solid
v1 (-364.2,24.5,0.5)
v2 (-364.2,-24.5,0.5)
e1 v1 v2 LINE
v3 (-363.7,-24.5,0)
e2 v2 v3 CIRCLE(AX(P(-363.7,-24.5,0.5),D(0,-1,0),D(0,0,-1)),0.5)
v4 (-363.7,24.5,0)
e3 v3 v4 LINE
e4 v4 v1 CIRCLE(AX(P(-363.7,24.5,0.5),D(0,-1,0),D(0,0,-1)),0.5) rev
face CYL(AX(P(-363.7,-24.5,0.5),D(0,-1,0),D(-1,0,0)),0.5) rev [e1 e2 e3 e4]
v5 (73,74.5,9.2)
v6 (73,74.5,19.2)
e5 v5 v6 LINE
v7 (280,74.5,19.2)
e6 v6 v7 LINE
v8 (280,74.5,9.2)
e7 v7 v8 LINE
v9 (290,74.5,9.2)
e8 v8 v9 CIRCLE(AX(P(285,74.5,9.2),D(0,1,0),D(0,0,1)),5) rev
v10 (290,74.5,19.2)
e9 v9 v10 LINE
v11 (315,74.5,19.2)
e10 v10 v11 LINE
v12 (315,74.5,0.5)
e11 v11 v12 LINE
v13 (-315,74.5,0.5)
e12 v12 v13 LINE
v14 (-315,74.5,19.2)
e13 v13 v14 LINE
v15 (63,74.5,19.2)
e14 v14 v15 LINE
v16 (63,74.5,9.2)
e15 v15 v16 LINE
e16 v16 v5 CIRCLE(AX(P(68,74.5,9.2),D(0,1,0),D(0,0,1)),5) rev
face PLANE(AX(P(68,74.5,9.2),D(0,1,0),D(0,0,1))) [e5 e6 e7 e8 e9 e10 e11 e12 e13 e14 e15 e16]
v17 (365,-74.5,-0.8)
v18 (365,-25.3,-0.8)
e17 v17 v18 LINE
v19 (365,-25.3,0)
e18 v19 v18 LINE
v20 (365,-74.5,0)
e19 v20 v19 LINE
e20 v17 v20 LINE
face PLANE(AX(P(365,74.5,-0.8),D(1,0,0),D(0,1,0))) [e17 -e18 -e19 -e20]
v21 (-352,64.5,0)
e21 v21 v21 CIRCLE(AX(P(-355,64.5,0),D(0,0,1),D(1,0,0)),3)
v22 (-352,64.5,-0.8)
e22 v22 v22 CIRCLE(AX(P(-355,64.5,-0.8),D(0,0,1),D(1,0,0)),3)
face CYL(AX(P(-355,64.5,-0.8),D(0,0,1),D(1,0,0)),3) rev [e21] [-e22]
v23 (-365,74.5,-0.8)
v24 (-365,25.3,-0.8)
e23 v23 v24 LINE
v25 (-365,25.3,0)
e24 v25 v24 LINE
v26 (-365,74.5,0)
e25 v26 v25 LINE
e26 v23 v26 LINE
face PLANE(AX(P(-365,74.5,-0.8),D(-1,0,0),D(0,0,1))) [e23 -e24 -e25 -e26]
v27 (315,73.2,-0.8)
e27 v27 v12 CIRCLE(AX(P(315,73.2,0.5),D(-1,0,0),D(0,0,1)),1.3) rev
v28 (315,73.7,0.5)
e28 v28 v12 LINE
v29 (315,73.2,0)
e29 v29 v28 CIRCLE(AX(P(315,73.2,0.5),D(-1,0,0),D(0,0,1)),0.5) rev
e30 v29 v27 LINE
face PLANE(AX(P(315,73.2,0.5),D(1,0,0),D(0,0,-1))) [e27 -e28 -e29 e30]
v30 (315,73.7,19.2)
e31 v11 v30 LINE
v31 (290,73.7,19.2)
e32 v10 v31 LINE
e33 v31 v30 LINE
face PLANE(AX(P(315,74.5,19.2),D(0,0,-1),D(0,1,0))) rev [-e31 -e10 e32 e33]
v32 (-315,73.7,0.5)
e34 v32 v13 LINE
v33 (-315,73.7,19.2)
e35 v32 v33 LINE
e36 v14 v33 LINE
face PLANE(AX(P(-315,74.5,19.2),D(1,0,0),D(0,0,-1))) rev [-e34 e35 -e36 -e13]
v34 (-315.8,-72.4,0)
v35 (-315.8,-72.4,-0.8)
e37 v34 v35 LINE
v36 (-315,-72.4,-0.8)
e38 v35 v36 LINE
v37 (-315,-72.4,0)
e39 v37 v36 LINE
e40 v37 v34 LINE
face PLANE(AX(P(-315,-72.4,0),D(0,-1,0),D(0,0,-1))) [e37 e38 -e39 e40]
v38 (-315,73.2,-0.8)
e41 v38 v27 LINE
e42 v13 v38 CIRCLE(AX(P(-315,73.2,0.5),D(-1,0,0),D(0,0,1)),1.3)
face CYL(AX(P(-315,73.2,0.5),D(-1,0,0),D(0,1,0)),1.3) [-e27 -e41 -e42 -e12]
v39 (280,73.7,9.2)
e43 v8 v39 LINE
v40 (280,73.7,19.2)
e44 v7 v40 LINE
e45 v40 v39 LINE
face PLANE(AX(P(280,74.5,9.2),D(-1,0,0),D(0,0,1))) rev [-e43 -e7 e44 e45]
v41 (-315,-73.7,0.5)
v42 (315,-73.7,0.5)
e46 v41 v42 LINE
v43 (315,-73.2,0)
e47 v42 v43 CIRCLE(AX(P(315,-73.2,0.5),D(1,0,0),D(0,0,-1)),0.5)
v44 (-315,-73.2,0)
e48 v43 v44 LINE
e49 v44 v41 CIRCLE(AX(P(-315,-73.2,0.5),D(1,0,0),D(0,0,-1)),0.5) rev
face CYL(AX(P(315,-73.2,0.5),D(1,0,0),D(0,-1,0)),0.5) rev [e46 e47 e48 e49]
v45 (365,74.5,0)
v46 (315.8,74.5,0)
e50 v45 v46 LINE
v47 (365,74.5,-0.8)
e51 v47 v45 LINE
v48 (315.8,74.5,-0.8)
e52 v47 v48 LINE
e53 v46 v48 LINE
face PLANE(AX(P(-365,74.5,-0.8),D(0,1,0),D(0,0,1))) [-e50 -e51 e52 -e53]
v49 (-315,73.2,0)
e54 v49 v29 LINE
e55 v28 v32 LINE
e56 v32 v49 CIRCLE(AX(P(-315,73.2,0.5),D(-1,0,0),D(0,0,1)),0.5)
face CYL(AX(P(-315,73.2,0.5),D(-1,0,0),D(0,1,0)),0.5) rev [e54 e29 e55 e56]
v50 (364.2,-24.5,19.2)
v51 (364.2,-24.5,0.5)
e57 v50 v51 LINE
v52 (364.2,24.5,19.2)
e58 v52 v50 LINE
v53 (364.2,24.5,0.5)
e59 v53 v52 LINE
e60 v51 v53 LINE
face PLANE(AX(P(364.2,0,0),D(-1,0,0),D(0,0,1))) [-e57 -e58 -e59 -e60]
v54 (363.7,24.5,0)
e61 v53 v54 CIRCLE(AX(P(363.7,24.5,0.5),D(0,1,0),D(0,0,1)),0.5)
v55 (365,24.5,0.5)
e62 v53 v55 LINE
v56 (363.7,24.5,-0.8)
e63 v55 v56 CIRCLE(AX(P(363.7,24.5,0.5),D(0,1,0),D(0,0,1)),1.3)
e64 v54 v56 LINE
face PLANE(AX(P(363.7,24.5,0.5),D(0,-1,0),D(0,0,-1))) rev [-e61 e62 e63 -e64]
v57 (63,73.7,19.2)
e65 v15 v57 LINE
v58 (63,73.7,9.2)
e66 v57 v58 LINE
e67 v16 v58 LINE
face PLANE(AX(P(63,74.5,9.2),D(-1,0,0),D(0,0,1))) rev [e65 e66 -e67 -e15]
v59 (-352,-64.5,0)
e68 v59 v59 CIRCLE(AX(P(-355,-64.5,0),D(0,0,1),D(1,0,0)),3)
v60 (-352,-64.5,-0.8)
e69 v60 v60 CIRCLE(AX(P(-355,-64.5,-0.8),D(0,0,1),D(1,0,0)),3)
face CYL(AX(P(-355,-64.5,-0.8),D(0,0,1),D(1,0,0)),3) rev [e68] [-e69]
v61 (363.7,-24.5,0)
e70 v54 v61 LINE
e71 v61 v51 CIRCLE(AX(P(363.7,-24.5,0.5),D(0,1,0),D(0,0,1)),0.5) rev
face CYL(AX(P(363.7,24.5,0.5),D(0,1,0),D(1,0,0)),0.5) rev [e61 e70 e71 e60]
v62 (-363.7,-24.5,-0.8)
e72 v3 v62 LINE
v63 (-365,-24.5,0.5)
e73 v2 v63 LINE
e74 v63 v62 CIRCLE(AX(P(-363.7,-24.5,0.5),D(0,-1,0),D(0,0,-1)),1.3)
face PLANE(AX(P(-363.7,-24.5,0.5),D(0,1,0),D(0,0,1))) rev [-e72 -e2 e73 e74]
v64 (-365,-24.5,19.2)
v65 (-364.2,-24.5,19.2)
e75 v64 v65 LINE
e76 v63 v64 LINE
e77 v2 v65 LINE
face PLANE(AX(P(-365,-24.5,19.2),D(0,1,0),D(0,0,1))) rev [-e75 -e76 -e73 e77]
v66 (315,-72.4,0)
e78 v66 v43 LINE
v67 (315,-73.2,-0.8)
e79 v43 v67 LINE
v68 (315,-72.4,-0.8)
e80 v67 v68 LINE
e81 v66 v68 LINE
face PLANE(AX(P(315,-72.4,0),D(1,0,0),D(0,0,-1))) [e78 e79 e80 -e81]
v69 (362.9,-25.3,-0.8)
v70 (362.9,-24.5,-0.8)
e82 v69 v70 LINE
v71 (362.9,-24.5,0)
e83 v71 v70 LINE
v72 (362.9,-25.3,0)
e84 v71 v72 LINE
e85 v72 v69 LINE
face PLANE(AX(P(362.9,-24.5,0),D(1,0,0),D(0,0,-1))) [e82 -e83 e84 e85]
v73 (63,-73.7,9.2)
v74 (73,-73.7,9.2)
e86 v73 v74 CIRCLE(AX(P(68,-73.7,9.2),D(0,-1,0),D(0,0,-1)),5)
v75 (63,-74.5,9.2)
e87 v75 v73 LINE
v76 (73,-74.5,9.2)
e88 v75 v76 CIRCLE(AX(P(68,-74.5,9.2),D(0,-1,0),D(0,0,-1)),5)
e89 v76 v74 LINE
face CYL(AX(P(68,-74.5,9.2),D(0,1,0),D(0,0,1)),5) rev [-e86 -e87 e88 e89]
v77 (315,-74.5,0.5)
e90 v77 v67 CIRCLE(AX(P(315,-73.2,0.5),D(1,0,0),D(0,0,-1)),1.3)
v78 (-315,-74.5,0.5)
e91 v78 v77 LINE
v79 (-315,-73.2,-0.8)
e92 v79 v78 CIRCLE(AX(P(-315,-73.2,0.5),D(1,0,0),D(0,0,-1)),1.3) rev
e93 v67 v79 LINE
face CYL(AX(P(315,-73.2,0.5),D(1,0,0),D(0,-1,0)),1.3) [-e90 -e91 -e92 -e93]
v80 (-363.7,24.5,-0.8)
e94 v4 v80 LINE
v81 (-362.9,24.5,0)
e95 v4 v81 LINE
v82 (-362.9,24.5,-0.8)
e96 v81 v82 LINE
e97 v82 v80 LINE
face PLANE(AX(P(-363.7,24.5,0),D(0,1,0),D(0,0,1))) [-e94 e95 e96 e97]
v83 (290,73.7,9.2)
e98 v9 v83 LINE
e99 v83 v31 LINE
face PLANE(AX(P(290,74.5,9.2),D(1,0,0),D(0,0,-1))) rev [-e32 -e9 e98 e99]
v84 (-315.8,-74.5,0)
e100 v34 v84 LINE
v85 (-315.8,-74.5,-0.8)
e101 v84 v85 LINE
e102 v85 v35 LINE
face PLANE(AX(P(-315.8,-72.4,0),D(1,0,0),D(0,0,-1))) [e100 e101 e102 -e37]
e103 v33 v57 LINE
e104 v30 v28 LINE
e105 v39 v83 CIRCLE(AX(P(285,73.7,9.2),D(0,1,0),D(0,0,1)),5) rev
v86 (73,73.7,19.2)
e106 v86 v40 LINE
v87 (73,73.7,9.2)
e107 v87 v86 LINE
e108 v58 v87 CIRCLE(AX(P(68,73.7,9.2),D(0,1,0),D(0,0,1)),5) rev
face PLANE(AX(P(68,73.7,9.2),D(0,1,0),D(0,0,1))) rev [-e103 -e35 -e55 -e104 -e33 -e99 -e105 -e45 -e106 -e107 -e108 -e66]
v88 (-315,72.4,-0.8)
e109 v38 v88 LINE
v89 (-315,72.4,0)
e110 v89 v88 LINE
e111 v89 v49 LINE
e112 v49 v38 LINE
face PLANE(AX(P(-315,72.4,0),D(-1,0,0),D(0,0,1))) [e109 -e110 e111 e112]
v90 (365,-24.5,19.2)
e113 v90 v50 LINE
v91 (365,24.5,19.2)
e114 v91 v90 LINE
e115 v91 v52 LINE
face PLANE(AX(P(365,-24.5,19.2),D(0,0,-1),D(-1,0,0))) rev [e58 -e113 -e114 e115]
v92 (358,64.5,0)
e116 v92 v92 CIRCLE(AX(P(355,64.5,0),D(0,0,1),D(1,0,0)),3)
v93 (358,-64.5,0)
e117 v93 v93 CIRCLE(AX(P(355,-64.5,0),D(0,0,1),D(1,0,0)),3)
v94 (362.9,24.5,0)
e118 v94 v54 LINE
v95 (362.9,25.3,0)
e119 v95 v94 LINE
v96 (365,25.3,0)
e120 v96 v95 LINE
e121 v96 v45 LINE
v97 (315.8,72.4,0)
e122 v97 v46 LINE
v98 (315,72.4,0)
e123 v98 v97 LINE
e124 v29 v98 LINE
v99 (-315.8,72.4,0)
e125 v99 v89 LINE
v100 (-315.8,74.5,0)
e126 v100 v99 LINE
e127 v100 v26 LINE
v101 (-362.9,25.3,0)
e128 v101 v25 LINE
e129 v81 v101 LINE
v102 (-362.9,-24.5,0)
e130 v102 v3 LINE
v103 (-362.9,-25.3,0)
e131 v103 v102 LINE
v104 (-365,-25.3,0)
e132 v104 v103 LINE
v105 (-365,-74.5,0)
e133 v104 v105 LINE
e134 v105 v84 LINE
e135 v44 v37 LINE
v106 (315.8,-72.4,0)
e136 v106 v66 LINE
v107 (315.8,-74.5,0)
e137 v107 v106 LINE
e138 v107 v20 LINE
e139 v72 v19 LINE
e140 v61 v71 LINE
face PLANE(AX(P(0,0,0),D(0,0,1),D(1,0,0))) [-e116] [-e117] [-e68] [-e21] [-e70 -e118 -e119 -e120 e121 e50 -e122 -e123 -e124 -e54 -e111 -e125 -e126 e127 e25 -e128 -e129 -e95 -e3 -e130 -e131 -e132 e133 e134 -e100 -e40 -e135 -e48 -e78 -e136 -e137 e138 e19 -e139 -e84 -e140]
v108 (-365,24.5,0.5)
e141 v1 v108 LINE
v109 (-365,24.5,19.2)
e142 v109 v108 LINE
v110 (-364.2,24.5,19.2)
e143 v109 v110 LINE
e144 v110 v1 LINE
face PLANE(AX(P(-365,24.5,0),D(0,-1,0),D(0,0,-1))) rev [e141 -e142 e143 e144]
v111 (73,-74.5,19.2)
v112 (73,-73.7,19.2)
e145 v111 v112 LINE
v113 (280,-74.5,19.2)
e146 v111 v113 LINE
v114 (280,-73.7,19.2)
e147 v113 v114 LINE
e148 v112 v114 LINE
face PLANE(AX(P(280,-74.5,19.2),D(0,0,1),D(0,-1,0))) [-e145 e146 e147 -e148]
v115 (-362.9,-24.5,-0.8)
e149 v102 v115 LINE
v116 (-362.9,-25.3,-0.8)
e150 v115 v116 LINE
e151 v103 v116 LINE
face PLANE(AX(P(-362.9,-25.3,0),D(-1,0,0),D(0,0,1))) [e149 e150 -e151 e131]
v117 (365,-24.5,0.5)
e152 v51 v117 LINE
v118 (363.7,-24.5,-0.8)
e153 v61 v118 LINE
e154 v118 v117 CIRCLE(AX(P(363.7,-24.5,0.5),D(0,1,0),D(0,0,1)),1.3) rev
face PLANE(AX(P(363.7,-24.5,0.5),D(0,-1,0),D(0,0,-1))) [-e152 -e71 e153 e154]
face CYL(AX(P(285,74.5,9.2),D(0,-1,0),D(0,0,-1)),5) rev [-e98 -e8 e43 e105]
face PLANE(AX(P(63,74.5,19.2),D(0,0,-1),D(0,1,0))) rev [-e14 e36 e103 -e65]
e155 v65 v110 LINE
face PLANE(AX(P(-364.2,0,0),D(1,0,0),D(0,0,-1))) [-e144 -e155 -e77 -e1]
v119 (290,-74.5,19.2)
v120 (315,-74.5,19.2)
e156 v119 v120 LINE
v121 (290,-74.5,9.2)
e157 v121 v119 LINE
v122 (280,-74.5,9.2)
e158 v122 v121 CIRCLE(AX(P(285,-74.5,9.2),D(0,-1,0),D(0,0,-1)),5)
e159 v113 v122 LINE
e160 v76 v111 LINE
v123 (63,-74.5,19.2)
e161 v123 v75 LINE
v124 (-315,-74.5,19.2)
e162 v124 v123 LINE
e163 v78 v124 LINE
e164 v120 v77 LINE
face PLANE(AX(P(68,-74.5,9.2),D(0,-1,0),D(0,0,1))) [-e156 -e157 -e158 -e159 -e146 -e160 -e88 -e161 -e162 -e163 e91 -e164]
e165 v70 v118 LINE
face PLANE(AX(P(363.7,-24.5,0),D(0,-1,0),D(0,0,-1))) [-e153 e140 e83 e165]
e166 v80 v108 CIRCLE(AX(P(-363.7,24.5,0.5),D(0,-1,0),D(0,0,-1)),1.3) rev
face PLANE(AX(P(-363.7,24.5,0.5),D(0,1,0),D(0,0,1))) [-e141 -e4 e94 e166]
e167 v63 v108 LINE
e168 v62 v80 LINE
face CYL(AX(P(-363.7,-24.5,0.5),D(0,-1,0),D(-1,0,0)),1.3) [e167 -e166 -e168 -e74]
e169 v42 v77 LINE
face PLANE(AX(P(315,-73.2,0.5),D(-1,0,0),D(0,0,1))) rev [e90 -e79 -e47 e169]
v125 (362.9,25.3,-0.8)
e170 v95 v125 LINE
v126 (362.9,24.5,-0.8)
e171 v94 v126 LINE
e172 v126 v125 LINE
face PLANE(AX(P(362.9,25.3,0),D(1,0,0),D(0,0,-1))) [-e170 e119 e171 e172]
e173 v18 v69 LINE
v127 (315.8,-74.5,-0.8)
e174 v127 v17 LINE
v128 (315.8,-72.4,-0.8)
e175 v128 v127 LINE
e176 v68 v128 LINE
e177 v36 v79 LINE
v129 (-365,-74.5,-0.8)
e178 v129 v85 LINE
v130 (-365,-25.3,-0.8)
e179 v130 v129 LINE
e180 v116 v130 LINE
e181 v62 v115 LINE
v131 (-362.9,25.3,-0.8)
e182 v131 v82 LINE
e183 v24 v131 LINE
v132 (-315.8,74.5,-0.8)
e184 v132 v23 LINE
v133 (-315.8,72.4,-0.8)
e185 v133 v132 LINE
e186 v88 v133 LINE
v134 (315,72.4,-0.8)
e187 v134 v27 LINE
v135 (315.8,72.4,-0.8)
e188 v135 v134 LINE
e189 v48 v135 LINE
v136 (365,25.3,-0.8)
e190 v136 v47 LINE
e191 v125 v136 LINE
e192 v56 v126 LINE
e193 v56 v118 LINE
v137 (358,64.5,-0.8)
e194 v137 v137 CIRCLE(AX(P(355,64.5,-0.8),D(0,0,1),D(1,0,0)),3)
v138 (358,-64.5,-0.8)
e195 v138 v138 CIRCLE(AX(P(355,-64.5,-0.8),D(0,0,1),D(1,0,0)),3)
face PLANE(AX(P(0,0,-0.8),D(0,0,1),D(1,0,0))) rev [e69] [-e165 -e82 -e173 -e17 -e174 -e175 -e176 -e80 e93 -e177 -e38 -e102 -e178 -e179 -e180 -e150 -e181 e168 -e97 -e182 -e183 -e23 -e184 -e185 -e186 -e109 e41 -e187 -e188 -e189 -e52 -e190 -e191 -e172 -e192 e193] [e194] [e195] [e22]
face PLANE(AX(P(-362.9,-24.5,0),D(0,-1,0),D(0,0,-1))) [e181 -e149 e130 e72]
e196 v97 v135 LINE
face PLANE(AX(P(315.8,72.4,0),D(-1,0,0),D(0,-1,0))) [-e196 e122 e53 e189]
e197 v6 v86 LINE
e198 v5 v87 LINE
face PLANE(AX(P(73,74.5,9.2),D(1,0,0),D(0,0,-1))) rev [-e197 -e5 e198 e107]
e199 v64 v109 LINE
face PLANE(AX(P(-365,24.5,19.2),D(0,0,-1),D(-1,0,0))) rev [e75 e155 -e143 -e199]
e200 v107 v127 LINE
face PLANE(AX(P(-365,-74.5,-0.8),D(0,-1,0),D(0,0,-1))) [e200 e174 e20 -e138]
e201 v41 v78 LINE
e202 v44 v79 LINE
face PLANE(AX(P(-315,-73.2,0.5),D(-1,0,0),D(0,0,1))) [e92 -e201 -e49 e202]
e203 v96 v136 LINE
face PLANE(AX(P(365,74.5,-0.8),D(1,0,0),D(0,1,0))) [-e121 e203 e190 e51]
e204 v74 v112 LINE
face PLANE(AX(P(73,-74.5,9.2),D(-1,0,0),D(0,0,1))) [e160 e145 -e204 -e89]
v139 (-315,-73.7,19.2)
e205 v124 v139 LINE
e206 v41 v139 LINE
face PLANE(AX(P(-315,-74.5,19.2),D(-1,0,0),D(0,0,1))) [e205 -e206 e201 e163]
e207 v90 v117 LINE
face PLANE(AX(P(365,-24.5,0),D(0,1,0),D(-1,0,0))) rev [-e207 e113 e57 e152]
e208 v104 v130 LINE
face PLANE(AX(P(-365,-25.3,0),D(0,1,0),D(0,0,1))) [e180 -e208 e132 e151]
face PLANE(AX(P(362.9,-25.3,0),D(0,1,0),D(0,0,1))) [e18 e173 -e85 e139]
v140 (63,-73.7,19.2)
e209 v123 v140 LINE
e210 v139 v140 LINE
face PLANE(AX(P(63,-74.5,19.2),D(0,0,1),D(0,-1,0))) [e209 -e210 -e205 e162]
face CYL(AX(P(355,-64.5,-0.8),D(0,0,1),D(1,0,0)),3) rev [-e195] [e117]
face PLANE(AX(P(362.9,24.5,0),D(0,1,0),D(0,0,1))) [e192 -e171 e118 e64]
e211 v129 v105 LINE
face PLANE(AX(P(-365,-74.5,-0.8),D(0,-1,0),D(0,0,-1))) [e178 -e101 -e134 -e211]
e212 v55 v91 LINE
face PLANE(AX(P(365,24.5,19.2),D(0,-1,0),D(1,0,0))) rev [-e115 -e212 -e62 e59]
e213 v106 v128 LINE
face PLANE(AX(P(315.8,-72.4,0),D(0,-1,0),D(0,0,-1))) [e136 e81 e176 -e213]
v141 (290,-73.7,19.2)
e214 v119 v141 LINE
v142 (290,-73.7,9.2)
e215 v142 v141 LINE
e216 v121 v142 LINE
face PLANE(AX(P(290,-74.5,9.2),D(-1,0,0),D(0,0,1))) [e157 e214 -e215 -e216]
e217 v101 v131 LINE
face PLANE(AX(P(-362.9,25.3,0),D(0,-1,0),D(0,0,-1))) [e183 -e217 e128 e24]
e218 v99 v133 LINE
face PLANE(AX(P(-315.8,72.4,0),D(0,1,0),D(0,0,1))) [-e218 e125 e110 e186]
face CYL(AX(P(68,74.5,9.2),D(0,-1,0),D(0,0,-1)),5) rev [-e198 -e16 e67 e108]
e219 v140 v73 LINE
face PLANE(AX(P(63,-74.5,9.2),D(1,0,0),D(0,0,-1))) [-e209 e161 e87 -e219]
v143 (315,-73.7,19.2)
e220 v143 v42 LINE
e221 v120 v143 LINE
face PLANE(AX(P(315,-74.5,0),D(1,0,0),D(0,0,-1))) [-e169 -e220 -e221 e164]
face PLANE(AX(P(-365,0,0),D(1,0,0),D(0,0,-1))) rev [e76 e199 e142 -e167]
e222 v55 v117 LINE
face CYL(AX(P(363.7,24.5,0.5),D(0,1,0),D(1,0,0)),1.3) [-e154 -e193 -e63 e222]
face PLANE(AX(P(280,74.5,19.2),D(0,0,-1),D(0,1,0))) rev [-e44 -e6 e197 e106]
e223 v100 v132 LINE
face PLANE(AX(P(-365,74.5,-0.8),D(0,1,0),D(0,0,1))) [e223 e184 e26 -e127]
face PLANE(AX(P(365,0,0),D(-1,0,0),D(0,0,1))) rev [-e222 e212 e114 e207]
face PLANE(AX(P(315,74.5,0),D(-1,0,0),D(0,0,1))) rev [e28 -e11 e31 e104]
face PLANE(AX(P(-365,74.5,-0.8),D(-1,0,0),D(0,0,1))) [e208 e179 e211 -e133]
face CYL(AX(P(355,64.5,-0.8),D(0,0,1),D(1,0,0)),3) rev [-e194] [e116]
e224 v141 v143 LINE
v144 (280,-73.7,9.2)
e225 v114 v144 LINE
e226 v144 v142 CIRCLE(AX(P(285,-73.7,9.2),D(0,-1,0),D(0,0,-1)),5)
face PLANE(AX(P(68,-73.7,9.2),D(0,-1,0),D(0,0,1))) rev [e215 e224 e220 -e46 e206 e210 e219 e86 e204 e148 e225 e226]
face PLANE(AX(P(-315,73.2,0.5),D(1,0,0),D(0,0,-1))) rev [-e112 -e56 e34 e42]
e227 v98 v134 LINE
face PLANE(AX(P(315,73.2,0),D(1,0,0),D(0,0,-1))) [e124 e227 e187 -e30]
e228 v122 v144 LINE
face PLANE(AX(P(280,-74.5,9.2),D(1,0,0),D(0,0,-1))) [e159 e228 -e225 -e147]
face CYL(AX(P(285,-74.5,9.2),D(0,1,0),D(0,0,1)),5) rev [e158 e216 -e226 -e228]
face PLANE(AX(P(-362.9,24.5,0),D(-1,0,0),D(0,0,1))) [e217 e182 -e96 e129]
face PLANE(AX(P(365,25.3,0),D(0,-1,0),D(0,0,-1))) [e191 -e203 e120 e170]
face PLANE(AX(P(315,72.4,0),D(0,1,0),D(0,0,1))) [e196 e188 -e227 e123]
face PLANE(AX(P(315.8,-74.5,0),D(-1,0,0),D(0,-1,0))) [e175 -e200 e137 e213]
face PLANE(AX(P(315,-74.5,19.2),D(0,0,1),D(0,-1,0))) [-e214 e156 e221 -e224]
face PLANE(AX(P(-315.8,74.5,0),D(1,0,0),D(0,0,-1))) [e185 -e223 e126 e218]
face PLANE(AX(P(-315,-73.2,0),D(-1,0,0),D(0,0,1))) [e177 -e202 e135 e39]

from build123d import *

# Parameters (mm, degrees)
SKETCH_1_W                        = 730
SKETCH_1_H                        = 149
SKETCH_1_R                        = 3
SM_BASE_FLANGE_1_DEPTH            = 0.8
SM_EDGE_FLANGE_1_STRIP_W          = 4.2
SM_EDGE_FLANGE_1_STRIP_H          = 0.8
SM_EDGE_FLANGE_1_STRIP_CUT_DEPTH  = 49
SM_EDGE_FLANGE_1_RELIEF_W         = 5
SM_EDGE_FLANGE_1_RELIEF_H         = 0.8
SM_EDGE_FLANGE_1_RELIEF_CUT_DEPTH = 0.8
SM_EDGE_FLANGE_1_DEPTH            = 49
SM_EDGE_FLANGE_2_STRIP_W          = 4.2
SM_EDGE_FLANGE_2_STRIP_H          = 0.8
SM_EDGE_FLANGE_2_STRIP_CUT_DEPTH  = 49
SM_EDGE_FLANGE_2_RELIEF_W         = 5
SM_EDGE_FLANGE_2_RELIEF_H         = 0.8
SM_EDGE_FLANGE_2_RELIEF_CUT_DEPTH = 0.8
SM_EDGE_FLANGE_2_DEPTH            = 49
SM_EDGE_FLANGE_3_STRIP_W          = 4.2
SM_EDGE_FLANGE_3_STRIP_H          = 0.8
SM_EDGE_FLANGE_3_STRIP_CUT_DEPTH  = 630
SM_EDGE_FLANGE_3_RELIEF_W         = 5
SM_EDGE_FLANGE_3_RELIEF_H         = 0.8
SM_EDGE_FLANGE_3_RELIEF_CUT_DEPTH = 0.8
SM_EDGE_FLANGE_3_DEPTH            = 630
SM_EDGE_FLANGE_3_FLAT_DEPTH       = 0.8


# Sheet-metal steps are written as plain solids
with BuildPart() as part:
    # Sketch 1 → 基体-法兰1 (new body)
    with BuildSketch(Plane.XY):
        Rectangle(SKETCH_1_W, SKETCH_1_H)
        with Locations((-355, 64.5)):
            Circle(SKETCH_1_R, mode=Mode.SUBTRACT)
        with Locations((-355, -64.5)):
            Circle(SKETCH_1_R, mode=Mode.SUBTRACT)
        with Locations((355, 64.5)):
            Circle(SKETCH_1_R, mode=Mode.SUBTRACT)
        with Locations((355, -64.5)):
            Circle(SKETCH_1_R, mode=Mode.SUBTRACT)
    extrude(amount=-SM_BASE_FLANGE_1_DEPTH)

    # 边线-法兰1 strip (across the edge) → 边线-法兰1 strip cut (cut)
    with BuildSketch(Plane(origin=(-365, 24.5, 0), x_dir=(1, 0, 0), z_dir=(0, -1, 0))):
        with Locations((-0.8, -0.4)):
            Rectangle(SM_EDGE_FLANGE_1_STRIP_W, SM_EDGE_FLANGE_1_STRIP_H)
    extrude(amount=SM_EDGE_FLANGE_1_STRIP_CUT_DEPTH, mode=Mode.SUBTRACT)

    # 边线-法兰1 relief (on the sheet) → 边线-法兰1 relief cut (cut)
    with BuildSketch(Plane(origin=(-363.7, 24.5, 0), x_dir=(1, 0, 0), z_dir=(0, 0, 1))):
        with Locations((-1.7, 0.4)):
            Rectangle(SM_EDGE_FLANGE_1_RELIEF_W, SM_EDGE_FLANGE_1_RELIEF_H)
        with Locations((-1.7, -49.4)):
            Rectangle(SM_EDGE_FLANGE_1_RELIEF_W, SM_EDGE_FLANGE_1_RELIEF_H)
    extrude(amount=-SM_EDGE_FLANGE_1_RELIEF_CUT_DEPTH, mode=Mode.SUBTRACT)

    # 边线-法兰1 section (across the edge) → 边线-法兰1 (add)
    with BuildSketch(Plane(origin=(-365, 24.5, 0), x_dir=(1, 0, 0), z_dir=(0, -1, 0))):
        with BuildLine():
            Line((0, 0.5), (0, 19.2))
            Line((0, 19.2), (0.8, 19.2))
            Line((0.8, 19.2), (0.8, 0.5))
            ThreePointArc((0.8, 0.5), (0.946446609, 0.146446609), (1.3, 0))
            Line((1.3, 0), (1.3, -0.8))
            ThreePointArc((1.3, -0.8), (0.380761184, -0.419238816), (0, 0.5))
        make_face()
    extrude(amount=SM_EDGE_FLANGE_1_DEPTH)

    # 边线-法兰2 strip (across the edge) → 边线-法兰2 strip cut (cut)
    with BuildSketch(Plane(origin=(365, -24.5, 0), x_dir=(-1, 0, 0), z_dir=(0, 1, 0))):
        with Locations((-0.8, -0.4)):
            Rectangle(SM_EDGE_FLANGE_2_STRIP_W, SM_EDGE_FLANGE_2_STRIP_H)
    extrude(amount=SM_EDGE_FLANGE_2_STRIP_CUT_DEPTH, mode=Mode.SUBTRACT)

    # 边线-法兰2 relief (on the sheet) → 边线-法兰2 relief cut (cut)
    with BuildSketch(Plane(origin=(363.7, -24.5, 0), x_dir=(-1, 0, 0), z_dir=(0, 0, 1))):
        with Locations((-1.7, 0.4)):
            Rectangle(SM_EDGE_FLANGE_2_RELIEF_W, SM_EDGE_FLANGE_2_RELIEF_H)
        with Locations((-1.7, -49.4)):
            Rectangle(SM_EDGE_FLANGE_2_RELIEF_W, SM_EDGE_FLANGE_2_RELIEF_H)
    extrude(amount=-SM_EDGE_FLANGE_2_RELIEF_CUT_DEPTH, mode=Mode.SUBTRACT)

    # 边线-法兰2 section (across the edge) → 边线-法兰2 (add)
    with BuildSketch(Plane(origin=(365, -24.5, 0), x_dir=(-1, 0, 0), z_dir=(0, 1, 0))):
        with BuildLine():
            Line((0, 0.5), (0, 19.2))
            Line((0, 19.2), (0.8, 19.2))
            Line((0.8, 19.2), (0.8, 0.5))
            ThreePointArc((0.8, 0.5), (0.946446609, 0.146446609), (1.3, 0))
            Line((1.3, 0), (1.3, -0.8))
            ThreePointArc((1.3, -0.8), (0.380761184, -0.419238816), (0, 0.5))
        make_face()
    extrude(amount=SM_EDGE_FLANGE_2_DEPTH)

    # 边线-法兰3 strip (across the edge) → 边线-法兰3 strip cut (cut)
    with BuildSketch(Plane(origin=(315, 74.5, 0), x_dir=(0, -1, 0), z_dir=(-1, 0, 0))):
        with Locations((-0.8, -0.4)):
            Rectangle(SM_EDGE_FLANGE_3_STRIP_W, SM_EDGE_FLANGE_3_STRIP_H)
    sm_edge_flange_3_strip_cut = extrude(amount=SM_EDGE_FLANGE_3_STRIP_CUT_DEPTH, mode=Mode.SUBTRACT)

    # 边线-法兰3 relief (on the sheet) → 边线-法兰3 relief cut (cut)
    with BuildSketch(Plane(origin=(315, 73.2, 0), x_dir=(0, -1, 0), z_dir=(0, 0, 1))):
        with Locations((-1.7, 0.4)):
            Rectangle(SM_EDGE_FLANGE_3_RELIEF_W, SM_EDGE_FLANGE_3_RELIEF_H)
        with Locations((-1.7, -630.4)):
            Rectangle(SM_EDGE_FLANGE_3_RELIEF_W, SM_EDGE_FLANGE_3_RELIEF_H)
    sm_edge_flange_3_relief_cut = extrude(amount=-SM_EDGE_FLANGE_3_RELIEF_CUT_DEPTH, mode=Mode.SUBTRACT)

    # 边线-法兰3 bend section (across the edge) → 边线-法兰3 (add)
    with BuildSketch(Plane(origin=(315, 74.5, 0), x_dir=(0, -1, 0), z_dir=(-1, 0, 0))):
        with BuildLine():
            Line((0, 0.5), (0.8, 0.5))
            ThreePointArc((0.8, 0.5), (0.946446609, 0.146446609), (1.3, 0))
            Line((1.3, 0), (1.3, -0.8))
            ThreePointArc((1.3, -0.8), (0.380761184, -0.419238816), (0, 0.5))
        make_face()
    sm_edge_flange_3 = extrude(amount=SM_EDGE_FLANGE_3_DEPTH)

    # 边线-法兰3 profile (on flange) → 边线-法兰3 flat (add)
    with BuildSketch(Plane(origin=(0, 74.5, 0), x_dir=(-1, 0, 0), z_dir=(0, 1, 0))):
        with BuildLine():
            Line((-315, 0.5), (315, 0.5))
            Line((315, 0.5), (315, 19.2))
            Line((315, 19.2), (-63, 19.2))
            Line((-63, 19.2), (-63, 9.2))
            ThreePointArc((-63, 9.2), (-68, 4.2), (-73, 9.2))
            Line((-73, 9.2), (-73, 19.2))
            Line((-73, 19.2), (-280, 19.2))
            Line((-280, 19.2), (-280, 9.2))
            ThreePointArc((-280, 9.2), (-285, 4.2), (-290, 9.2))
            Line((-290, 9.2), (-290, 19.2))
            Line((-290, 19.2), (-315, 19.2))
            Line((-315, 19.2), (-315, 0.5))
        make_face()
    sm_edge_flange_3_flat = extrude(amount=-SM_EDGE_FLANGE_3_FLAT_DEPTH)

    # 镜向1: 边线-法兰3 strip cut, 边线-法兰3 relief cut, 边线-法兰3, 边线-法兰3 flat across plane
    add(sm_edge_flange_3_strip_cut.mirror(Plane.ZX), mode=Mode.SUBTRACT)
    add(sm_edge_flange_3_relief_cut.mirror(Plane.ZX), mode=Mode.SUBTRACT)
    add(sm_edge_flange_3.mirror(Plane.ZX))
    add(sm_edge_flange_3_flat.mirror(Plane.ZX))


solid = part.part
